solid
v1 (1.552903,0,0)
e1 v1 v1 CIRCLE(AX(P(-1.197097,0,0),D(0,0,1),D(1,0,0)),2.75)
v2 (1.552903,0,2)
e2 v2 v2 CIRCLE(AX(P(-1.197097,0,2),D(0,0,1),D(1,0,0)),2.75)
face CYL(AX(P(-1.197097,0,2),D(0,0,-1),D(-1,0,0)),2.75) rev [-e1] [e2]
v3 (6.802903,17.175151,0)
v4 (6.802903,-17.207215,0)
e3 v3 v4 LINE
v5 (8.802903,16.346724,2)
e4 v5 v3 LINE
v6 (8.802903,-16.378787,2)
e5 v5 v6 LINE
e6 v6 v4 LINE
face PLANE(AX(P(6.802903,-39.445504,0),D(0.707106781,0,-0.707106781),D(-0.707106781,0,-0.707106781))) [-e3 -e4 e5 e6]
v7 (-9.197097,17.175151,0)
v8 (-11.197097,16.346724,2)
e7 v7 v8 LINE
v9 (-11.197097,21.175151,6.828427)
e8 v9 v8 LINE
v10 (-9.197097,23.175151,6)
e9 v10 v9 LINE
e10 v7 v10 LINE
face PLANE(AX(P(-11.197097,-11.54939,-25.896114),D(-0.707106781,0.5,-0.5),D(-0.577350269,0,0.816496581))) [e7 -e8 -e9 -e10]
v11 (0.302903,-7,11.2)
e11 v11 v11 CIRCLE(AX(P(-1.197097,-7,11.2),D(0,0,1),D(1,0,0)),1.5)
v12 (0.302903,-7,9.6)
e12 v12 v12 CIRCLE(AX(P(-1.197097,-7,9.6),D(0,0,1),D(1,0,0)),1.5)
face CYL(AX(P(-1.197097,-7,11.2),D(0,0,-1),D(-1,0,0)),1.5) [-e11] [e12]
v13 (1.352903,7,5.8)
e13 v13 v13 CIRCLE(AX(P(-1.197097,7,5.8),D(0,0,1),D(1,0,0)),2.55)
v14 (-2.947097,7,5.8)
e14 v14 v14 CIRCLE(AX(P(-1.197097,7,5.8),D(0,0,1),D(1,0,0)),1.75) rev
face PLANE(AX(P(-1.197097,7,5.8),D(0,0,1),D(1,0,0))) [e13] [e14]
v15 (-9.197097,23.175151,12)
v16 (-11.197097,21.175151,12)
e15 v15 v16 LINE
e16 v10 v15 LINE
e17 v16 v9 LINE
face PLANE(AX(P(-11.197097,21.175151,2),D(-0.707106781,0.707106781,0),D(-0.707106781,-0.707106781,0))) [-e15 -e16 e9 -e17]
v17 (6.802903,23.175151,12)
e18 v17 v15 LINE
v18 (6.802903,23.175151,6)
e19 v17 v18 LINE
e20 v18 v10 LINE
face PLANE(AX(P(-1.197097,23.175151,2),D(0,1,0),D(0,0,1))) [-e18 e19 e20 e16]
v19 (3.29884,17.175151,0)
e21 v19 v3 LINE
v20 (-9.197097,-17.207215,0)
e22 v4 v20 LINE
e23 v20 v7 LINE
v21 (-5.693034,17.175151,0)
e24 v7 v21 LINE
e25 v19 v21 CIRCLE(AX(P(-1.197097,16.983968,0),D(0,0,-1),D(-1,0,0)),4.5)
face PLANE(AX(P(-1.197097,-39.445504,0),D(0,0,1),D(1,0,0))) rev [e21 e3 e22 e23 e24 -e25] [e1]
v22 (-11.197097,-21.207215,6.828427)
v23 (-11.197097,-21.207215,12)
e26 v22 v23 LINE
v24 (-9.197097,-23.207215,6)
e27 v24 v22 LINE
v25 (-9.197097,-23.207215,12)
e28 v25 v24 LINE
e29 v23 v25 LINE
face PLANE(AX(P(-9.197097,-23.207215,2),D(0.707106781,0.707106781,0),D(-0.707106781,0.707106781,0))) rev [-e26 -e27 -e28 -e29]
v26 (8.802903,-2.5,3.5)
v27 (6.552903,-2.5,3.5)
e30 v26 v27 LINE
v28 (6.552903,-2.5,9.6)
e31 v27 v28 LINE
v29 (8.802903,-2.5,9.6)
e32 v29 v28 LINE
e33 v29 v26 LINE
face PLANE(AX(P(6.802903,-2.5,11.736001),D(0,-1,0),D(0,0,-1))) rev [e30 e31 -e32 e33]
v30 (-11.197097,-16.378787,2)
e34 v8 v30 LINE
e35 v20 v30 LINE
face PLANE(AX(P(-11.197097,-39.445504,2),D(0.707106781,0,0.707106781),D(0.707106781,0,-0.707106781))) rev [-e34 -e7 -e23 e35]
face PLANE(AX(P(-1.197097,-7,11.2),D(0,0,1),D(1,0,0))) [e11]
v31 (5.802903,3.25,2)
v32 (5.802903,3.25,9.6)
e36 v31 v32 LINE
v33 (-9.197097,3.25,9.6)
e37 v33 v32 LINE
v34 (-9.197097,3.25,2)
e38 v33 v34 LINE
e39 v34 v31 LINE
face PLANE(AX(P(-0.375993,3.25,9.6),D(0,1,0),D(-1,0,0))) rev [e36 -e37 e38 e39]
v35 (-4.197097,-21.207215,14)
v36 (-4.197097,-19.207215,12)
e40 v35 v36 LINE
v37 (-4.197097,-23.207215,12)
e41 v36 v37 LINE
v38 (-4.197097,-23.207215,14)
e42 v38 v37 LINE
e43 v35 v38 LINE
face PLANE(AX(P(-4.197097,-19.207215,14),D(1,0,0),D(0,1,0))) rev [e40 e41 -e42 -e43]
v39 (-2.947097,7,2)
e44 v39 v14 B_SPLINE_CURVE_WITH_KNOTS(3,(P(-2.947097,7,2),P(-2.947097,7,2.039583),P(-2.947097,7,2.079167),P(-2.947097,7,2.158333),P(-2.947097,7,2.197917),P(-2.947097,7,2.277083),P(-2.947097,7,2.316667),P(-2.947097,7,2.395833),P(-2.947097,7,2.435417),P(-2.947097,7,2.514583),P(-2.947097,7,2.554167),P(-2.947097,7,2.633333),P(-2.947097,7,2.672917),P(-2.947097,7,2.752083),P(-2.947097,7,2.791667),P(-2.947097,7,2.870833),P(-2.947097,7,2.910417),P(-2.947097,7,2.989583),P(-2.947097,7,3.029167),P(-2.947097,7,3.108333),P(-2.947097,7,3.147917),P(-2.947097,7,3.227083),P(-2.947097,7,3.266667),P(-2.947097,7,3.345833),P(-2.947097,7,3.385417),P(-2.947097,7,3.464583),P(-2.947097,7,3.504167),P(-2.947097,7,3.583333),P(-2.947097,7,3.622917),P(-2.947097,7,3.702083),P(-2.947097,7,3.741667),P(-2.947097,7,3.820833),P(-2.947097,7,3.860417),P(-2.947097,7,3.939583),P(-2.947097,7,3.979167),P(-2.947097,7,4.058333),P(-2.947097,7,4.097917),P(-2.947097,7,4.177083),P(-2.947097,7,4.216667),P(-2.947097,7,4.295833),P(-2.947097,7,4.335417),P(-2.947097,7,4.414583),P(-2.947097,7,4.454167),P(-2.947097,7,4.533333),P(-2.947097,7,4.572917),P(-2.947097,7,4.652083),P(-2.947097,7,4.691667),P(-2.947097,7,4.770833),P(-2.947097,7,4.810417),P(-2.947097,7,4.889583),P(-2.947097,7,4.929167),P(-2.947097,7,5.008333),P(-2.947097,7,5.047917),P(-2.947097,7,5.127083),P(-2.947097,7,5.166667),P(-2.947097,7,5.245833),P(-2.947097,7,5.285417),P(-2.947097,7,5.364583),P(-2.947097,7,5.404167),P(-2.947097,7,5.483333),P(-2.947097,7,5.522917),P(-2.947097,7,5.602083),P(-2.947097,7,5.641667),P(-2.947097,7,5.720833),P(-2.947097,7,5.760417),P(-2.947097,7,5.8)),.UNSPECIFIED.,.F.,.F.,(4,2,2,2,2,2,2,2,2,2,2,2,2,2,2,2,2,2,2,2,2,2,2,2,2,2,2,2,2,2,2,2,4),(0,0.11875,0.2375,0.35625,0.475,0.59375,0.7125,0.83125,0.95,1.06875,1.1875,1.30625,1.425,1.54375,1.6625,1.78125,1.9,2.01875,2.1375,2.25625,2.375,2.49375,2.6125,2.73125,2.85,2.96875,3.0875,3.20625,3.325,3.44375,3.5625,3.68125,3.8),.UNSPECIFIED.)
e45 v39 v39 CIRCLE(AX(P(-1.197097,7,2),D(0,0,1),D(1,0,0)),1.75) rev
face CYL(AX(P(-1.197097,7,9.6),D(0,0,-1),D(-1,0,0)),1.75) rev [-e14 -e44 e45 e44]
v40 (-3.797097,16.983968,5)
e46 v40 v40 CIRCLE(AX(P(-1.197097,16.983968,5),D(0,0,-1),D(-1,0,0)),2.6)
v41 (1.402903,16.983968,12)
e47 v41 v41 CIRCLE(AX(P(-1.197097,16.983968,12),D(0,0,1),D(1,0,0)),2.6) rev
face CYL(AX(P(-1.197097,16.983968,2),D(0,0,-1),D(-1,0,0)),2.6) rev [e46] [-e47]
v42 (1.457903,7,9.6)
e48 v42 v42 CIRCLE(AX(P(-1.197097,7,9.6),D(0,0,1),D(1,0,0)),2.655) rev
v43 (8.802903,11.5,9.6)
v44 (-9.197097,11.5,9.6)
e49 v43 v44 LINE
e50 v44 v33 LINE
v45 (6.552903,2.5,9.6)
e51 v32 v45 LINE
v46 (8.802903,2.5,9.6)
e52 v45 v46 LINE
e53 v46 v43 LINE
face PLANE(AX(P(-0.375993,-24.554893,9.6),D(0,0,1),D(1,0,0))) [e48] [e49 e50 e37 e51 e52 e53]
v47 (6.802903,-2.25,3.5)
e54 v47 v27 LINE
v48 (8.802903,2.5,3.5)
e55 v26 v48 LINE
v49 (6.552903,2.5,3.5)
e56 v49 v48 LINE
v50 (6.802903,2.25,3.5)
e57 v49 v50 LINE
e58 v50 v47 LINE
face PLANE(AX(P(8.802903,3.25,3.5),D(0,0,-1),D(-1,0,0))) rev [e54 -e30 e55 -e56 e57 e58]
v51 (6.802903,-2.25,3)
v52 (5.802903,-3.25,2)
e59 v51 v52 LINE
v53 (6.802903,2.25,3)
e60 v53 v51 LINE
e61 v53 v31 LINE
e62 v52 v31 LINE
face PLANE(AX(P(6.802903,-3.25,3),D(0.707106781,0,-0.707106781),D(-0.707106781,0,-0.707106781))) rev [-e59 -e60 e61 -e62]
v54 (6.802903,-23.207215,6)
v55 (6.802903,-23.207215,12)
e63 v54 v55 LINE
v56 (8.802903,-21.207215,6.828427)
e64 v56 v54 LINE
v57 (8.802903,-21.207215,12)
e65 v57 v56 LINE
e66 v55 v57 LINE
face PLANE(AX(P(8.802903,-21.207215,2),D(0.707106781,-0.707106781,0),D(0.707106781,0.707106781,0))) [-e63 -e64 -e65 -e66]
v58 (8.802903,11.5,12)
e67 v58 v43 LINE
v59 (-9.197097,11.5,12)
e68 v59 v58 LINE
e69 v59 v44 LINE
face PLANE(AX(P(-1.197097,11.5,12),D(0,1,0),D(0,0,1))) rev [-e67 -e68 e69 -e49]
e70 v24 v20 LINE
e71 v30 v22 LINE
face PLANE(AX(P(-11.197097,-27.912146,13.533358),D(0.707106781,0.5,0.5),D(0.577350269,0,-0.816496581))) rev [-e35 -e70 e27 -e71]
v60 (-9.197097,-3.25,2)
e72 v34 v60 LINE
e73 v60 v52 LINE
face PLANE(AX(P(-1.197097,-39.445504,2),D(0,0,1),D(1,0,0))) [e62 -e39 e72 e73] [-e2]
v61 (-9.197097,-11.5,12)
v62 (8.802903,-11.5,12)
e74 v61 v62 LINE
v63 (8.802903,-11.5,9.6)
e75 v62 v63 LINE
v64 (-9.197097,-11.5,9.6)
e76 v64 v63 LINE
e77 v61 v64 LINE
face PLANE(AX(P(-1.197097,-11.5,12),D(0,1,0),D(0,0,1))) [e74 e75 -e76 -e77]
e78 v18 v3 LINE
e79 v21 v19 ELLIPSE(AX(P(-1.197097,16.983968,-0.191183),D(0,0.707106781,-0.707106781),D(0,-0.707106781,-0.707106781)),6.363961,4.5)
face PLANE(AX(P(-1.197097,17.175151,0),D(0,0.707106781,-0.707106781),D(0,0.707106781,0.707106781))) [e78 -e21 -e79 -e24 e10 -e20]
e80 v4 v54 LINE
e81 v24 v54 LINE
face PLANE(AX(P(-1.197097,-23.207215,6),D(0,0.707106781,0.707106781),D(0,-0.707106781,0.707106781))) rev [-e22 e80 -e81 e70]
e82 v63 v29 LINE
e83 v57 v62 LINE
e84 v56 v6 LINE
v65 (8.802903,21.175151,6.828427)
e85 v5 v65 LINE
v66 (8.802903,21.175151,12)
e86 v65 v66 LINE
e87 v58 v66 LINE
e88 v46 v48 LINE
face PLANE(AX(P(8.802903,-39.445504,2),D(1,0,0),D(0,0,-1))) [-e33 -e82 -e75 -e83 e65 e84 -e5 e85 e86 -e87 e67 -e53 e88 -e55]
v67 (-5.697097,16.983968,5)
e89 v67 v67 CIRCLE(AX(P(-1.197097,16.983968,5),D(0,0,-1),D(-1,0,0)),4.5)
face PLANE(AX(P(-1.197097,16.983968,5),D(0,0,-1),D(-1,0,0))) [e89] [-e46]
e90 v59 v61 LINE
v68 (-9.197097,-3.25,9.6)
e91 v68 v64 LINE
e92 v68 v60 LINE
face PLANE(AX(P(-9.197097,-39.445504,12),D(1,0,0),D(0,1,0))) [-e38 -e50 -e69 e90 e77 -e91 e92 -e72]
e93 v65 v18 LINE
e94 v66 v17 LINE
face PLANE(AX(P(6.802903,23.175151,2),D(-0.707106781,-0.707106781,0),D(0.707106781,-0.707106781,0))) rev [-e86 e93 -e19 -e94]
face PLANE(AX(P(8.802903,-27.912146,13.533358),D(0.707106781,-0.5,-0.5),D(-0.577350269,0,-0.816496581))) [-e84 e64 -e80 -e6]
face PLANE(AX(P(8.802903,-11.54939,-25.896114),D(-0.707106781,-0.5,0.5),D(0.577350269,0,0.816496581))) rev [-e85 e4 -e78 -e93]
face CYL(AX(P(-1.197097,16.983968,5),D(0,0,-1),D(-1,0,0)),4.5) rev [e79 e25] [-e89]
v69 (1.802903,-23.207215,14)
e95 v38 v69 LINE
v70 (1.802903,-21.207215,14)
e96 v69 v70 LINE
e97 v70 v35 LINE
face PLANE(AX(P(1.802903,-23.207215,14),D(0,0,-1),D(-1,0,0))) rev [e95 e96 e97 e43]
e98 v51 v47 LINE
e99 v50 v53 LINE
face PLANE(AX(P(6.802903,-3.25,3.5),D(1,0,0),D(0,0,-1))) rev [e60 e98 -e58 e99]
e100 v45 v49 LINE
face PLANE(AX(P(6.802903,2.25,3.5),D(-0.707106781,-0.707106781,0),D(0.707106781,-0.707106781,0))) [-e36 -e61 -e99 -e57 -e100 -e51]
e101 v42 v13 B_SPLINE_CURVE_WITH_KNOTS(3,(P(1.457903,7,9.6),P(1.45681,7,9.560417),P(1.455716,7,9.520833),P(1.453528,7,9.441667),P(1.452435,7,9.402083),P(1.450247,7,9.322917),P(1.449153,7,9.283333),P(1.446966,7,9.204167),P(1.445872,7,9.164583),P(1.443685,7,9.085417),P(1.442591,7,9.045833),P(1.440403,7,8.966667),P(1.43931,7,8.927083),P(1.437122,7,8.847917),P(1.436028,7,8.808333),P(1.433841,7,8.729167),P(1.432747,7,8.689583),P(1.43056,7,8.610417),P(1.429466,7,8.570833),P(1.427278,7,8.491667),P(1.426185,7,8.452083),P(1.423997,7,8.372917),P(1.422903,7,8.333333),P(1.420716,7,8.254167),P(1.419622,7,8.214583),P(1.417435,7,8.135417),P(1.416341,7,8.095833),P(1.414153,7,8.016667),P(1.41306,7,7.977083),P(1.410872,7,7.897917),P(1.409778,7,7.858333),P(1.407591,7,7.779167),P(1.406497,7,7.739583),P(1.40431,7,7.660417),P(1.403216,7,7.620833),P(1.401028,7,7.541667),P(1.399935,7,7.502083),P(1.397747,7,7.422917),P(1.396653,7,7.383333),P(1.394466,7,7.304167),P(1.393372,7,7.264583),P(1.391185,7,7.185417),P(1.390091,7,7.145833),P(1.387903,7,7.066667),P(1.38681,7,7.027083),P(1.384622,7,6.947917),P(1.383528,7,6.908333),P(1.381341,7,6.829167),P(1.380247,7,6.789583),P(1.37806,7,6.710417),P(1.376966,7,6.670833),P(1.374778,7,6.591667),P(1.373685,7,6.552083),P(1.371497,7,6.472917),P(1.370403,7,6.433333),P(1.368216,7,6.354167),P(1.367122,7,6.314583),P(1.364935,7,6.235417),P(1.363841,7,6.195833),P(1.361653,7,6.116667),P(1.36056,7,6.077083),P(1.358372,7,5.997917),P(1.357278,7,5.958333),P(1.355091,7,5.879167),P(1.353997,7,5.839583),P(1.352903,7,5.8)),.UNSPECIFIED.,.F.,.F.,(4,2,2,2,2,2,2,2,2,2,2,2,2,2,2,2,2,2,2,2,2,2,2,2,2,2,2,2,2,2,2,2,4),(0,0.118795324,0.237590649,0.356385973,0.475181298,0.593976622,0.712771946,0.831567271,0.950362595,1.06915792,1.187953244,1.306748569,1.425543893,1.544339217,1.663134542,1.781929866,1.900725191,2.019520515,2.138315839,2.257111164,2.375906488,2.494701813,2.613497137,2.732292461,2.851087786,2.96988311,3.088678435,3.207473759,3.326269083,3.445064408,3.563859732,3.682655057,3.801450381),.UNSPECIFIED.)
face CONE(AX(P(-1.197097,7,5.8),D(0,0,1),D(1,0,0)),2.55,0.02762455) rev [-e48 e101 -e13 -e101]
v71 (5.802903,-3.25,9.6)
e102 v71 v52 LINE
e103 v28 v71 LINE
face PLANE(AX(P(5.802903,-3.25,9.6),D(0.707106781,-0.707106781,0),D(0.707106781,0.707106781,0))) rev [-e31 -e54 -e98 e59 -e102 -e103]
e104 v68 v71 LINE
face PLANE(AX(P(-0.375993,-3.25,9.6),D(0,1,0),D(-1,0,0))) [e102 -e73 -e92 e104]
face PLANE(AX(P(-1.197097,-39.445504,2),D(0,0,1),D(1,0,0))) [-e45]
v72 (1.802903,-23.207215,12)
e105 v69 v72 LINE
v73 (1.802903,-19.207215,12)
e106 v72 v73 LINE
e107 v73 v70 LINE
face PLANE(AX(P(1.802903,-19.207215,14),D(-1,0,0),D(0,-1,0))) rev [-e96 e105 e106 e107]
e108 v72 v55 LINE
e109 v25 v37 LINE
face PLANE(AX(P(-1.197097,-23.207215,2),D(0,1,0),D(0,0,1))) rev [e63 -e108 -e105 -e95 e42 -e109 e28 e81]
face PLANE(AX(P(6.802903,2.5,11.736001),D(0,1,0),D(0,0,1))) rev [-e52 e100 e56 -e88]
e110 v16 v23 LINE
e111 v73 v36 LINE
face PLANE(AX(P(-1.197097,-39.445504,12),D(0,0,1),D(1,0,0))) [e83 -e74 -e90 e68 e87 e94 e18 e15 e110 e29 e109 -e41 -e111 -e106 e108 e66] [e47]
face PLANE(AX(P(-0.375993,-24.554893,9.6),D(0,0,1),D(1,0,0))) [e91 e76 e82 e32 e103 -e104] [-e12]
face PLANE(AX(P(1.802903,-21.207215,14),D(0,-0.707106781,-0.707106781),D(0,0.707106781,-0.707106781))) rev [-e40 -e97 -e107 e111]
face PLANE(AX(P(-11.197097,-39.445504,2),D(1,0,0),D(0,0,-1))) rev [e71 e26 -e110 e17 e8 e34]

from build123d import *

# Parameters (mm, degrees)
SKETCH1_W            = 20
SKETCH1_H            = 46.382365304
SKETCH1_R            = 2.6
SKETCH1_R_2          = 1.75
SKETCH1_R_3          = 2.75
BOSS_EXTRUDE2_DEPTH  = 2
SKETCH2_R            = 2.6
BOSS_EXTRUDE3_DEPTH  = 10
SKETCH4_R            = 1.75
BOSS_EXTRUDE5_DEPTH  = 2
SKETCH5_R            = 4.5
CUT_EXTRUDE1_DEPTH   = 5
SKETCH3_W            = 18
SKETCH3_H            = 8.25
SKETCH3_R            = 1.75
BOSS_EXTRUDE9_DEPTH  = 7.6
SKETCH8_R            = 2.55
CUT_EXTRUDE3_DEPTH   = 3.8
CHAMFER5_SIZE2       = 3.8
CHAMFER5_SIZE        = 0.105
CHAMFER6_SIZE        = 6
CHAMFER7_SIZE        = 2
SKETCH9_W            = 2
SKETCH9_H            = 6.5
BOSS_EXTRUDE10_DEPTH = 1.5
SKETCH10_W           = 2
SKETCH10_H           = 0.75
BOSS_EXTRUDE11_DEPTH = 6.1
CHAMFER8_SIZE        = 1
SKETCH13_R           = 1.875965007
BOSS_EXTRUDE14_DEPTH = 7.6
SKETCH12_R           = 1.5
BOSS_EXTRUDE15_DEPTH = 1.6
SKETCH14_W           = 6
SKETCH14_H           = 4
BOSS_EXTRUDE16_DEPTH = 2
CHAMFER9_SIZE        = 2


# Some blends are built 0.0001 mm under size
with BuildPart() as part:
    # Sketch1 → Boss-Extrude2 (new body)
    with BuildSketch(Plane.XY):
        with Locations((-1.1970966, -0.016031908)):
            Rectangle(SKETCH1_W, SKETCH1_H)
        with Locations((-1.1970966, 16.983968092)):
            Circle(SKETCH1_R, mode=Mode.SUBTRACT)
        with Locations((-1.1970966, 7)):
            Circle(SKETCH1_R_2, mode=Mode.SUBTRACT)
        with Locations((-1.1970966, 0)):
            Circle(SKETCH1_R_3, mode=Mode.SUBTRACT)
    extrude(amount=BOSS_EXTRUDE2_DEPTH)

    # Sketch2 → Boss-Extrude3 (add)
    with BuildSketch(Plane.XY.offset(2)):
        Polygon((-11.1970966, 23.175150744), (-11.1970966, -23.20721456), (8.8029034, -23.20721456), (8.8029034, -11.5), (-9.1970966, -11.5), (-9.1970966, 11.5), (8.8029034, 11.5), (8.8029034, 23.175150744), align=None)
        with Locations((-1.1970966, 16.983968092)):
            Circle(SKETCH2_R, mode=Mode.SUBTRACT)
    extrude(amount=BOSS_EXTRUDE3_DEPTH)

    # Sketch4 → Boss-Extrude5 (add)
    with BuildSketch(Plane(origin=(0, 0, 0), x_dir=(-1, 0, 0), z_dir=(0, 0, -1))):
        with Locations((1.1970966, 7)):
            Circle(SKETCH4_R)
    extrude(amount=-BOSS_EXTRUDE5_DEPTH)

    # Sketch5 → Cut-Extrude1 (cut)
    with BuildSketch(Plane(origin=(0, 0, 0), x_dir=(-1, 0, 0), z_dir=(0, 0, -1))):
        with Locations((1.1970966, 16.983968092)):
            Circle(SKETCH5_R)
    extrude(amount=-CUT_EXTRUDE1_DEPTH, mode=Mode.SUBTRACT)

    # Sketch3 → Boss-Extrude9 (add)
    # profile 1 of 2: a face of its own
    with BuildSketch(Plane.XY.offset(2)):
        with Locations((-0.1970966, -7.375)):
            Rectangle(SKETCH3_W, SKETCH3_H)
        with Locations(Location((-1.1970966, -7, 0), (0, 0, 180))):
            Circle(SKETCH3_R, mode=Mode.SUBTRACT)
    # profile 2 of 2: a face of its own
    with BuildSketch(Plane.XY.offset(2)):
        with Locations((-0.1970966, 7.375)):
            Rectangle(SKETCH3_W, SKETCH3_H)
        with Locations(Location((-1.1970966, 7, 0), (0, 0, 180))):
            Circle(SKETCH3_R, mode=Mode.SUBTRACT)
    extrude(amount=BOSS_EXTRUDE9_DEPTH)

    # Sketch8 → Cut-Extrude3 (cut)
    with BuildSketch(Plane.XY.offset(9.6)):
        with Locations((-1.1970966, 7)):
            Circle(SKETCH8_R)
    extrude(amount=-CUT_EXTRUDE3_DEPTH, mode=Mode.SUBTRACT)

    # Chamfer5
    chamfer5_edges = [part.edges().sort_by_distance(p)[0] for p in [
        (-3.7470966, 7, 9.6),
    ]]
    chamfer5_side = [part.faces().sort_by_distance(p)[0] for p in [
        (-3.7491966, 7, 9.6),
    ]]
    chamfer(chamfer5_edges, length=CHAMFER5_SIZE - 0.0001, length2=CHAMFER5_SIZE2 - 0.0001, reference=chamfer5_side[0])  # a hair under: the kernel refuses the full size

    # Chamfer6
    # the kernel refuses this chamfer: 6 mm, written as the material it takes off along each edge
    with BuildSketch(Plane(origin=(-26.627194528, 23.175150744, 0), x_dir=(0, 0.027495876610586202, 0.9996219169112968), z_dir=(1, 0, 0)), Plane(origin=(24.233001328, -23.20721456, 0), x_dir=(0, -0.027495876610586202, 0.9996219169112968), z_dir=(-1, 0, 0))) as chamfer6_piece_1:
        Polygon((CHAMFER6_SIZE * 0.999621916911, CHAMFER6_SIZE * 0.0274958766106), (-CHAMFER6_SIZE * 0.0274958766106, CHAMFER6_SIZE * 0.999621916911), (0, 0), align=None)
    extrude(amount=50.860195856, mode=Mode.SUBTRACT)

    # Chamfer7
    chamfer7_edges = [part.edges().sort_by_distance(p)[0] for p in [
        (-11.1970966, -0.016031908, 0),
        (8.8029034, -0.016031908, 0),
        (8.8029034, -20.20721456, 3),
        (8.8029034, 20.175150744, 3),
        (-11.1970966, -20.20721456, 3),
        (-11.1970966, 20.175150744, 3),
        (-11.1970966, -23.20721456, 9),
        (-11.1970966, 23.175150744, 9),
        (8.8029034, 23.175150744, 9),
        (8.8029034, -23.20721456, 9),
    ]]
    chamfer(chamfer7_edges, length=CHAMFER7_SIZE - 0.0001)  # a hair under: the kernel refuses the full size

    # Sketch9 → Boss-Extrude10 (add)
    with BuildSketch(Plane.XY.offset(2)):
        with Locations((7.8029034, 0)):
            Rectangle(SKETCH9_W, SKETCH9_H)
    extrude(amount=BOSS_EXTRUDE10_DEPTH)

    # Sketch10 → Boss-Extrude11 (add)
    with BuildSketch(Plane.XY.offset(3.5)):
        with Locations((7.8029034, 2.875)):
            Rectangle(SKETCH10_W, SKETCH10_H)
        with Locations((7.8029034, -2.875)):
            Rectangle(SKETCH10_W, SKETCH10_H)
    extrude(amount=BOSS_EXTRUDE11_DEPTH)

    # Chamfer8
    chamfer8_edges = [part.edges().sort_by_distance(p)[0] for p in [
        (6.8029034, -3.25, 5.8),
        (6.8029034, 0, 2),
        (6.8029034, 3.25, 5.8),
    ]]
    chamfer(chamfer8_edges, length=CHAMFER8_SIZE)

    # Sketch13 → Boss-Extrude14 (add)
    with BuildSketch(Plane.XY.offset(2)):
        with Locations((-1.1970966, -7)):
            Circle(SKETCH13_R)
    extrude(amount=BOSS_EXTRUDE14_DEPTH)

    # Sketch12 → Boss-Extrude15 (add)
    with BuildSketch(Plane.XY.offset(9.6)):
        with Locations((-1.1970966, -7)):
            Circle(SKETCH12_R)
    extrude(amount=BOSS_EXTRUDE15_DEPTH)

    # Sketch14 → Boss-Extrude16 (add)
    with BuildSketch(Plane.XY.offset(12)):
        with Locations((-1.1970966, -21.20721456)):
            Rectangle(SKETCH14_W, SKETCH14_H)
    extrude(amount=BOSS_EXTRUDE16_DEPTH)

    # Chamfer9
    chamfer9_edges = [part.edges().sort_by_distance(p)[0] for p in [
        (-1.1970966, -19.20721456, 14),
    ]]
    chamfer(chamfer9_edges, length=CHAMFER9_SIZE - 0.0001)  # a hair under: the kernel refuses the full size


solid = part.part
